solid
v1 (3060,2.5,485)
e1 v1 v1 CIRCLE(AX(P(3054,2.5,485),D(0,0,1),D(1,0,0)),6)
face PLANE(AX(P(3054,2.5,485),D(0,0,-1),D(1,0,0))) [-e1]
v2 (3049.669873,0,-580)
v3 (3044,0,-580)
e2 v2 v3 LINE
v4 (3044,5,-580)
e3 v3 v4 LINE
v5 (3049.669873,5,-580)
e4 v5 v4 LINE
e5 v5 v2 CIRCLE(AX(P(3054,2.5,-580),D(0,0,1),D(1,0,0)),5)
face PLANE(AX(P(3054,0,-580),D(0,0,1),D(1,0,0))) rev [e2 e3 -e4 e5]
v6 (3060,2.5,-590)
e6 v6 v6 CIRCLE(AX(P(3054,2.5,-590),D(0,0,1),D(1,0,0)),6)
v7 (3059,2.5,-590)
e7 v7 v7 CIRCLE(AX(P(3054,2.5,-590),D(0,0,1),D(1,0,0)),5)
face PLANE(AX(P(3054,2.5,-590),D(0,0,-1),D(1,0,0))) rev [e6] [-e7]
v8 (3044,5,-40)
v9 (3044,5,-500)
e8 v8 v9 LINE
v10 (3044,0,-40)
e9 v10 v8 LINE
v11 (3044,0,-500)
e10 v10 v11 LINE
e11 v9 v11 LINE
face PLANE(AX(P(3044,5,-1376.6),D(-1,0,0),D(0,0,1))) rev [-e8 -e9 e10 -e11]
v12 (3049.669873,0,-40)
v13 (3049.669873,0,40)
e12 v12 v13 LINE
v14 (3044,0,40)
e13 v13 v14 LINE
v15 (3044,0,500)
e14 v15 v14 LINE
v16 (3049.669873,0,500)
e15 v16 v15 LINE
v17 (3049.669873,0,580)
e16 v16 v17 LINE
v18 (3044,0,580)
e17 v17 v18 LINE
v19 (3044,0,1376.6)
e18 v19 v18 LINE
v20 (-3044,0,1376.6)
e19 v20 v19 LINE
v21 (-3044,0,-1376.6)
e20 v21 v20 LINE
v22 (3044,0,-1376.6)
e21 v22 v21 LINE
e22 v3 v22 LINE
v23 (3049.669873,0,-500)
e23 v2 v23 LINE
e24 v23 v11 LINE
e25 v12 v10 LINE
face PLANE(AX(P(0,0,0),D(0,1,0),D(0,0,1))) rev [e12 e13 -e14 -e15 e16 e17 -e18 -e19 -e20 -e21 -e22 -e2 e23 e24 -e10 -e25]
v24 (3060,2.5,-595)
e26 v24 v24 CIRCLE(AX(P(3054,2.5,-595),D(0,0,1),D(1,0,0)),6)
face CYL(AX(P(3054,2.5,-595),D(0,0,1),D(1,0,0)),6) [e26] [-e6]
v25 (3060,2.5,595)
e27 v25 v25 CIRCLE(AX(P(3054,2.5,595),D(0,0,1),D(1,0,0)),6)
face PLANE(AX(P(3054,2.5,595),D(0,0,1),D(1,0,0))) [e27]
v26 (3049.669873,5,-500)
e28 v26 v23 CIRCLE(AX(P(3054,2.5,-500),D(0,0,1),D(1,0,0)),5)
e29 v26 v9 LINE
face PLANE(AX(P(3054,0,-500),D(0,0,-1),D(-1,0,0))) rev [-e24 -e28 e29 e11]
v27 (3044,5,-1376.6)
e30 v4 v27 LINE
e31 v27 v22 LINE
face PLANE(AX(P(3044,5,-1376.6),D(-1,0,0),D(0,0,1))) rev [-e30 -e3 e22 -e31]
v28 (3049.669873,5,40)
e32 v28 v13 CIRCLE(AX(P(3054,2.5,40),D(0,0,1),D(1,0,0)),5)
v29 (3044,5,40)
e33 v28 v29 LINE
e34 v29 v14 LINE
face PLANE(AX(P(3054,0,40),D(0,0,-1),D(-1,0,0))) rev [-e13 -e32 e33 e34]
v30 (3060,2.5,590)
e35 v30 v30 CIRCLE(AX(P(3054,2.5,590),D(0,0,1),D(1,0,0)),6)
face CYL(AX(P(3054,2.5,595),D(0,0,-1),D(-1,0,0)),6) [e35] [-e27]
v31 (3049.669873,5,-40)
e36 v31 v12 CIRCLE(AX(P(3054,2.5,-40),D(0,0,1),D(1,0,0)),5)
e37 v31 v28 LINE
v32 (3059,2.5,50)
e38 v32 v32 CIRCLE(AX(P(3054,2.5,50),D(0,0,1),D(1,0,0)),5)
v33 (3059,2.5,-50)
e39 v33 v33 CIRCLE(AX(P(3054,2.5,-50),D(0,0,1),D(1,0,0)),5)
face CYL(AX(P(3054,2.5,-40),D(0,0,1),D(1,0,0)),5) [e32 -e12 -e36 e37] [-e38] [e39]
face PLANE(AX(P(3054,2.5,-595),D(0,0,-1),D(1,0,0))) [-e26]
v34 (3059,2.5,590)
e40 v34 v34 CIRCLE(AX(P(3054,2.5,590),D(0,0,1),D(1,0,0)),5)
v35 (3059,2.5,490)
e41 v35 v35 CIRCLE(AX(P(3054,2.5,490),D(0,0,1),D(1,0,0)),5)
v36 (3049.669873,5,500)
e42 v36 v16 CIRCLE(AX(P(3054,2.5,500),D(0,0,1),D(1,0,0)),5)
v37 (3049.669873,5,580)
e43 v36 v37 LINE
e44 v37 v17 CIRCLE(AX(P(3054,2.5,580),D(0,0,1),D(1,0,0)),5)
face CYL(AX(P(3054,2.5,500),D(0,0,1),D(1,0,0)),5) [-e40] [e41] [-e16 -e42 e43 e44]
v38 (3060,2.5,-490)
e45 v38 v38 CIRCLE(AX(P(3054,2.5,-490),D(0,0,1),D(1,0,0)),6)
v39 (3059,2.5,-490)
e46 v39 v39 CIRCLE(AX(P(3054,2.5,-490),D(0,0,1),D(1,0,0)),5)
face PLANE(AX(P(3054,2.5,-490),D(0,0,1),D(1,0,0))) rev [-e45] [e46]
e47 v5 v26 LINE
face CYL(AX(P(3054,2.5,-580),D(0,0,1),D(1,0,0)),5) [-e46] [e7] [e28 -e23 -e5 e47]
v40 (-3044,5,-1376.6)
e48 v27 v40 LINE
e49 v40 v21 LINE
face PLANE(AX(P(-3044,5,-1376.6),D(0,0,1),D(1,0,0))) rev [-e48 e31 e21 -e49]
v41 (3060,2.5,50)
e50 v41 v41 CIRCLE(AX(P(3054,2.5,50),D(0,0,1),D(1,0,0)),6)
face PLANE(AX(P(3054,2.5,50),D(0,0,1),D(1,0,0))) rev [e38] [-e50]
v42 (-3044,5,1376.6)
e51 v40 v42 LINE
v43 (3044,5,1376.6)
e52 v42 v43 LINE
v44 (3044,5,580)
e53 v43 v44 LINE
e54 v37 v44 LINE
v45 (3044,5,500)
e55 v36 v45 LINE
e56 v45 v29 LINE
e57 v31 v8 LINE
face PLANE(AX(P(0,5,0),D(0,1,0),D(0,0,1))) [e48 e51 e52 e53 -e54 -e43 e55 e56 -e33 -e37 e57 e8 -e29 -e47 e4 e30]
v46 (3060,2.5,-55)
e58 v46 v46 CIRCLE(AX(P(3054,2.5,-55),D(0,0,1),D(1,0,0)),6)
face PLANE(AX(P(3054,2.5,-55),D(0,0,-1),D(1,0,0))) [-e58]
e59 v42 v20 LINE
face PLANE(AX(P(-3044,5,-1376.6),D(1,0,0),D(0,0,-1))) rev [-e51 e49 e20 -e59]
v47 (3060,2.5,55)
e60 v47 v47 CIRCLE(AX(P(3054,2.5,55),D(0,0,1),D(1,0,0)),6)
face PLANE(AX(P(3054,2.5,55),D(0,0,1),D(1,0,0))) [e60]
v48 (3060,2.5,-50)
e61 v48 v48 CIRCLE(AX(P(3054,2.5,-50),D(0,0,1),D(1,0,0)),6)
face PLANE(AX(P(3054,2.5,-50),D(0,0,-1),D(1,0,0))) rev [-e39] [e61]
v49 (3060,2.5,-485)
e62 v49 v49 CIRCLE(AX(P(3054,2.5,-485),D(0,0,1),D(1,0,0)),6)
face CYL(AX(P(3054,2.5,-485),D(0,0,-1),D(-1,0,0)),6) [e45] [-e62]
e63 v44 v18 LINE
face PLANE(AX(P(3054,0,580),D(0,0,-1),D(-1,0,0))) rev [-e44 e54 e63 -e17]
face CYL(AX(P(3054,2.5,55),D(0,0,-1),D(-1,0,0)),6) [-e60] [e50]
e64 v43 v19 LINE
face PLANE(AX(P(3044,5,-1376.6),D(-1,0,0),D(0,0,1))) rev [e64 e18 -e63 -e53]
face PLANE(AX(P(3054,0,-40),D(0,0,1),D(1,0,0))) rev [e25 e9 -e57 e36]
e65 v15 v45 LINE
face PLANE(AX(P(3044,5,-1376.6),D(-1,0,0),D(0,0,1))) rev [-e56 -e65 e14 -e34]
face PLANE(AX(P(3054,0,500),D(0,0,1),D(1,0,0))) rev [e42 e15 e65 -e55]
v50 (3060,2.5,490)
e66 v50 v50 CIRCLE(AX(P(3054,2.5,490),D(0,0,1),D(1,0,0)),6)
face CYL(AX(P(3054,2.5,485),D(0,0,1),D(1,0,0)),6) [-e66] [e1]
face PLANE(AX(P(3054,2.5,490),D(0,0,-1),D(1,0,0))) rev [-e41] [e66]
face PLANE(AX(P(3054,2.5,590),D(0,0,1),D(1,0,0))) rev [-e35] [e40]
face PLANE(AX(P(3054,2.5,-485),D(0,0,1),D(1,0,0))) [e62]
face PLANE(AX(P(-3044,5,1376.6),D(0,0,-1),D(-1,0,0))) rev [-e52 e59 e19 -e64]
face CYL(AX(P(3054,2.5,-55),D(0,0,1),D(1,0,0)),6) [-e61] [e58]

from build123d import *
from build123d.topology import SkipClean

# Parameters (mm, degrees)
SKETCH1_W               = 6088
SKETCH1_H               = 2753.2
BOSS_EXTRUDE1_DEPTH     = 5
SKETCH2_W               = 80
SKETCH2_H               = 5
BOSS_EXTRUDE2_DEPTH     = 10
SKETCH3_R               = 5
BOSS_EXTRUDE3_DEPTH     = 80
BOSS_EXTRUDE4_START     = 10
SKETCH4_R               = 5
BOSS_EXTRUDE4_DEPTH     = 10
SKETCH5_R               = 6
BOSS_EXTRUDE5_DEPTH     = 5
LPATTERN3_START         = -595
LPATTERN3_OUTLINE_R     = 5
LPATTERN3_DEPTH         = 105
LPATTERN3_2_OUTLINE_R   = 6
LPATTERN3_2_OUTLINE_R_2 = 5
LPATTERN3_2_DEPTH       = 5
LPATTERN4_START         = 485
LPATTERN4_OUTLINE_R     = 5
LPATTERN4_DEPTH         = 105
LPATTERN4_2_OUTLINE_R   = 6
LPATTERN4_2_OUTLINE_R_2 = 5
LPATTERN4_2_DEPTH       = 5
LPATTERN5_COUNT         = 2
LPATTERN5_PITCH         = 540


# Read off the part's stored shape, not the designer's step: LPattern3, LPattern4
with BuildPart() as part:
    # Sketch1 → Boss-Extrude1 (new body)
    with BuildSketch(Plane(origin=(0, 0, 0), x_dir=(1, 0, 0), z_dir=(0, 1, 0))):
        Rectangle(SKETCH1_W, SKETCH1_H)
    extrude(amount=BOSS_EXTRUDE1_DEPTH)

    # Sketch2 → Boss-Extrude2 (add)
    with BuildSketch(Plane(origin=(3044, 0, 0), x_dir=(0, 0, -1), z_dir=(1, 0, 0))):
        with Locations((0, 2.5)):
            Rectangle(SKETCH2_W, SKETCH2_H)
        with Locations((540, 2.5)):
            Rectangle(SKETCH2_W, SKETCH2_H)
        with Locations((-540, 2.5)):
            Rectangle(SKETCH2_W, SKETCH2_H)
    extrude(amount=BOSS_EXTRUDE2_DEPTH)

    # Sketch3 → Boss-Extrude3 (add)
    with BuildSketch(Plane.XY.offset(40)):
        with Locations((3054, 2.5)):
            Circle(SKETCH3_R)
    extrude(amount=-BOSS_EXTRUDE3_DEPTH)

    # Sketch4 → Boss-Extrude4 (add)
    with BuildSketch(Plane.XY.offset(40).offset(BOSS_EXTRUDE4_START)):
        with Locations((3054, 2.5)):
            Circle(SKETCH4_R)
    boss_extrude4 = extrude(amount=-BOSS_EXTRUDE4_DEPTH)

    # Sketch5 → Boss-Extrude5 (add)
    with BuildSketch(Plane.XY.offset(50)):
        with Locations((3054, 2.5)):
            Circle(SKETCH5_R)
    boss_extrude5 = extrude(amount=BOSS_EXTRUDE5_DEPTH)

    # Mirror1: Boss-Extrude4, Boss-Extrude5 across plane
    with SkipClean():  # the faces are left unmerged after this step: merging them gives an invalid solid
        add(boss_extrude4.mirror(Plane.XY))
        add(boss_extrude5.mirror(Plane.XY))

    # LPattern3 outline → LPattern3 (add)
    with BuildSketch(Plane.XY.offset(LPATTERN3_START)):
        with Locations((3054, 2.5)):
            Circle(LPATTERN3_OUTLINE_R)
    extrude(amount=LPATTERN3_DEPTH)

    # LPattern3 2 outline → LPattern3 2 (add)
    with BuildSketch(Plane.XY.offset(LPATTERN3_START)):
        with Locations((3054, 2.5)):
            Circle(LPATTERN3_2_OUTLINE_R)
        with Locations((3054, 2.5)):
            Circle(LPATTERN3_2_OUTLINE_R_2, mode=Mode.SUBTRACT)
    extrude(amount=LPATTERN3_2_DEPTH)

    # LPattern4 outline → LPattern4 (add)
    with BuildSketch(Plane.XY.offset(LPATTERN4_START)):
        with Locations((3054, 2.5)):
            Circle(LPATTERN4_OUTLINE_R)
    lpattern4 = extrude(amount=LPATTERN4_DEPTH)

    # LPattern4 2 outline → LPattern4 2 (add)
    with BuildSketch(Plane.XY.offset(LPATTERN4_START)):
        with Locations((3054, 2.5)):
            Circle(LPATTERN4_2_OUTLINE_R)
        with Locations((3054, 2.5)):
            Circle(LPATTERN4_2_OUTLINE_R_2, mode=Mode.SUBTRACT)
    lpattern4_2 = extrude(amount=LPATTERN4_2_DEPTH)

    # LPattern5: Boss-Extrude5 ×2
    with Locations(*[(0, 0, i * LPATTERN5_PITCH) for i in range(1, LPATTERN5_COUNT)]):
        add(boss_extrude5)

    # Mirror3: LPattern4, LPattern4 2 across plane
    add(lpattern4.mirror(Plane.XY))
    add(lpattern4_2.mirror(Plane.XY))


solid = part.part
